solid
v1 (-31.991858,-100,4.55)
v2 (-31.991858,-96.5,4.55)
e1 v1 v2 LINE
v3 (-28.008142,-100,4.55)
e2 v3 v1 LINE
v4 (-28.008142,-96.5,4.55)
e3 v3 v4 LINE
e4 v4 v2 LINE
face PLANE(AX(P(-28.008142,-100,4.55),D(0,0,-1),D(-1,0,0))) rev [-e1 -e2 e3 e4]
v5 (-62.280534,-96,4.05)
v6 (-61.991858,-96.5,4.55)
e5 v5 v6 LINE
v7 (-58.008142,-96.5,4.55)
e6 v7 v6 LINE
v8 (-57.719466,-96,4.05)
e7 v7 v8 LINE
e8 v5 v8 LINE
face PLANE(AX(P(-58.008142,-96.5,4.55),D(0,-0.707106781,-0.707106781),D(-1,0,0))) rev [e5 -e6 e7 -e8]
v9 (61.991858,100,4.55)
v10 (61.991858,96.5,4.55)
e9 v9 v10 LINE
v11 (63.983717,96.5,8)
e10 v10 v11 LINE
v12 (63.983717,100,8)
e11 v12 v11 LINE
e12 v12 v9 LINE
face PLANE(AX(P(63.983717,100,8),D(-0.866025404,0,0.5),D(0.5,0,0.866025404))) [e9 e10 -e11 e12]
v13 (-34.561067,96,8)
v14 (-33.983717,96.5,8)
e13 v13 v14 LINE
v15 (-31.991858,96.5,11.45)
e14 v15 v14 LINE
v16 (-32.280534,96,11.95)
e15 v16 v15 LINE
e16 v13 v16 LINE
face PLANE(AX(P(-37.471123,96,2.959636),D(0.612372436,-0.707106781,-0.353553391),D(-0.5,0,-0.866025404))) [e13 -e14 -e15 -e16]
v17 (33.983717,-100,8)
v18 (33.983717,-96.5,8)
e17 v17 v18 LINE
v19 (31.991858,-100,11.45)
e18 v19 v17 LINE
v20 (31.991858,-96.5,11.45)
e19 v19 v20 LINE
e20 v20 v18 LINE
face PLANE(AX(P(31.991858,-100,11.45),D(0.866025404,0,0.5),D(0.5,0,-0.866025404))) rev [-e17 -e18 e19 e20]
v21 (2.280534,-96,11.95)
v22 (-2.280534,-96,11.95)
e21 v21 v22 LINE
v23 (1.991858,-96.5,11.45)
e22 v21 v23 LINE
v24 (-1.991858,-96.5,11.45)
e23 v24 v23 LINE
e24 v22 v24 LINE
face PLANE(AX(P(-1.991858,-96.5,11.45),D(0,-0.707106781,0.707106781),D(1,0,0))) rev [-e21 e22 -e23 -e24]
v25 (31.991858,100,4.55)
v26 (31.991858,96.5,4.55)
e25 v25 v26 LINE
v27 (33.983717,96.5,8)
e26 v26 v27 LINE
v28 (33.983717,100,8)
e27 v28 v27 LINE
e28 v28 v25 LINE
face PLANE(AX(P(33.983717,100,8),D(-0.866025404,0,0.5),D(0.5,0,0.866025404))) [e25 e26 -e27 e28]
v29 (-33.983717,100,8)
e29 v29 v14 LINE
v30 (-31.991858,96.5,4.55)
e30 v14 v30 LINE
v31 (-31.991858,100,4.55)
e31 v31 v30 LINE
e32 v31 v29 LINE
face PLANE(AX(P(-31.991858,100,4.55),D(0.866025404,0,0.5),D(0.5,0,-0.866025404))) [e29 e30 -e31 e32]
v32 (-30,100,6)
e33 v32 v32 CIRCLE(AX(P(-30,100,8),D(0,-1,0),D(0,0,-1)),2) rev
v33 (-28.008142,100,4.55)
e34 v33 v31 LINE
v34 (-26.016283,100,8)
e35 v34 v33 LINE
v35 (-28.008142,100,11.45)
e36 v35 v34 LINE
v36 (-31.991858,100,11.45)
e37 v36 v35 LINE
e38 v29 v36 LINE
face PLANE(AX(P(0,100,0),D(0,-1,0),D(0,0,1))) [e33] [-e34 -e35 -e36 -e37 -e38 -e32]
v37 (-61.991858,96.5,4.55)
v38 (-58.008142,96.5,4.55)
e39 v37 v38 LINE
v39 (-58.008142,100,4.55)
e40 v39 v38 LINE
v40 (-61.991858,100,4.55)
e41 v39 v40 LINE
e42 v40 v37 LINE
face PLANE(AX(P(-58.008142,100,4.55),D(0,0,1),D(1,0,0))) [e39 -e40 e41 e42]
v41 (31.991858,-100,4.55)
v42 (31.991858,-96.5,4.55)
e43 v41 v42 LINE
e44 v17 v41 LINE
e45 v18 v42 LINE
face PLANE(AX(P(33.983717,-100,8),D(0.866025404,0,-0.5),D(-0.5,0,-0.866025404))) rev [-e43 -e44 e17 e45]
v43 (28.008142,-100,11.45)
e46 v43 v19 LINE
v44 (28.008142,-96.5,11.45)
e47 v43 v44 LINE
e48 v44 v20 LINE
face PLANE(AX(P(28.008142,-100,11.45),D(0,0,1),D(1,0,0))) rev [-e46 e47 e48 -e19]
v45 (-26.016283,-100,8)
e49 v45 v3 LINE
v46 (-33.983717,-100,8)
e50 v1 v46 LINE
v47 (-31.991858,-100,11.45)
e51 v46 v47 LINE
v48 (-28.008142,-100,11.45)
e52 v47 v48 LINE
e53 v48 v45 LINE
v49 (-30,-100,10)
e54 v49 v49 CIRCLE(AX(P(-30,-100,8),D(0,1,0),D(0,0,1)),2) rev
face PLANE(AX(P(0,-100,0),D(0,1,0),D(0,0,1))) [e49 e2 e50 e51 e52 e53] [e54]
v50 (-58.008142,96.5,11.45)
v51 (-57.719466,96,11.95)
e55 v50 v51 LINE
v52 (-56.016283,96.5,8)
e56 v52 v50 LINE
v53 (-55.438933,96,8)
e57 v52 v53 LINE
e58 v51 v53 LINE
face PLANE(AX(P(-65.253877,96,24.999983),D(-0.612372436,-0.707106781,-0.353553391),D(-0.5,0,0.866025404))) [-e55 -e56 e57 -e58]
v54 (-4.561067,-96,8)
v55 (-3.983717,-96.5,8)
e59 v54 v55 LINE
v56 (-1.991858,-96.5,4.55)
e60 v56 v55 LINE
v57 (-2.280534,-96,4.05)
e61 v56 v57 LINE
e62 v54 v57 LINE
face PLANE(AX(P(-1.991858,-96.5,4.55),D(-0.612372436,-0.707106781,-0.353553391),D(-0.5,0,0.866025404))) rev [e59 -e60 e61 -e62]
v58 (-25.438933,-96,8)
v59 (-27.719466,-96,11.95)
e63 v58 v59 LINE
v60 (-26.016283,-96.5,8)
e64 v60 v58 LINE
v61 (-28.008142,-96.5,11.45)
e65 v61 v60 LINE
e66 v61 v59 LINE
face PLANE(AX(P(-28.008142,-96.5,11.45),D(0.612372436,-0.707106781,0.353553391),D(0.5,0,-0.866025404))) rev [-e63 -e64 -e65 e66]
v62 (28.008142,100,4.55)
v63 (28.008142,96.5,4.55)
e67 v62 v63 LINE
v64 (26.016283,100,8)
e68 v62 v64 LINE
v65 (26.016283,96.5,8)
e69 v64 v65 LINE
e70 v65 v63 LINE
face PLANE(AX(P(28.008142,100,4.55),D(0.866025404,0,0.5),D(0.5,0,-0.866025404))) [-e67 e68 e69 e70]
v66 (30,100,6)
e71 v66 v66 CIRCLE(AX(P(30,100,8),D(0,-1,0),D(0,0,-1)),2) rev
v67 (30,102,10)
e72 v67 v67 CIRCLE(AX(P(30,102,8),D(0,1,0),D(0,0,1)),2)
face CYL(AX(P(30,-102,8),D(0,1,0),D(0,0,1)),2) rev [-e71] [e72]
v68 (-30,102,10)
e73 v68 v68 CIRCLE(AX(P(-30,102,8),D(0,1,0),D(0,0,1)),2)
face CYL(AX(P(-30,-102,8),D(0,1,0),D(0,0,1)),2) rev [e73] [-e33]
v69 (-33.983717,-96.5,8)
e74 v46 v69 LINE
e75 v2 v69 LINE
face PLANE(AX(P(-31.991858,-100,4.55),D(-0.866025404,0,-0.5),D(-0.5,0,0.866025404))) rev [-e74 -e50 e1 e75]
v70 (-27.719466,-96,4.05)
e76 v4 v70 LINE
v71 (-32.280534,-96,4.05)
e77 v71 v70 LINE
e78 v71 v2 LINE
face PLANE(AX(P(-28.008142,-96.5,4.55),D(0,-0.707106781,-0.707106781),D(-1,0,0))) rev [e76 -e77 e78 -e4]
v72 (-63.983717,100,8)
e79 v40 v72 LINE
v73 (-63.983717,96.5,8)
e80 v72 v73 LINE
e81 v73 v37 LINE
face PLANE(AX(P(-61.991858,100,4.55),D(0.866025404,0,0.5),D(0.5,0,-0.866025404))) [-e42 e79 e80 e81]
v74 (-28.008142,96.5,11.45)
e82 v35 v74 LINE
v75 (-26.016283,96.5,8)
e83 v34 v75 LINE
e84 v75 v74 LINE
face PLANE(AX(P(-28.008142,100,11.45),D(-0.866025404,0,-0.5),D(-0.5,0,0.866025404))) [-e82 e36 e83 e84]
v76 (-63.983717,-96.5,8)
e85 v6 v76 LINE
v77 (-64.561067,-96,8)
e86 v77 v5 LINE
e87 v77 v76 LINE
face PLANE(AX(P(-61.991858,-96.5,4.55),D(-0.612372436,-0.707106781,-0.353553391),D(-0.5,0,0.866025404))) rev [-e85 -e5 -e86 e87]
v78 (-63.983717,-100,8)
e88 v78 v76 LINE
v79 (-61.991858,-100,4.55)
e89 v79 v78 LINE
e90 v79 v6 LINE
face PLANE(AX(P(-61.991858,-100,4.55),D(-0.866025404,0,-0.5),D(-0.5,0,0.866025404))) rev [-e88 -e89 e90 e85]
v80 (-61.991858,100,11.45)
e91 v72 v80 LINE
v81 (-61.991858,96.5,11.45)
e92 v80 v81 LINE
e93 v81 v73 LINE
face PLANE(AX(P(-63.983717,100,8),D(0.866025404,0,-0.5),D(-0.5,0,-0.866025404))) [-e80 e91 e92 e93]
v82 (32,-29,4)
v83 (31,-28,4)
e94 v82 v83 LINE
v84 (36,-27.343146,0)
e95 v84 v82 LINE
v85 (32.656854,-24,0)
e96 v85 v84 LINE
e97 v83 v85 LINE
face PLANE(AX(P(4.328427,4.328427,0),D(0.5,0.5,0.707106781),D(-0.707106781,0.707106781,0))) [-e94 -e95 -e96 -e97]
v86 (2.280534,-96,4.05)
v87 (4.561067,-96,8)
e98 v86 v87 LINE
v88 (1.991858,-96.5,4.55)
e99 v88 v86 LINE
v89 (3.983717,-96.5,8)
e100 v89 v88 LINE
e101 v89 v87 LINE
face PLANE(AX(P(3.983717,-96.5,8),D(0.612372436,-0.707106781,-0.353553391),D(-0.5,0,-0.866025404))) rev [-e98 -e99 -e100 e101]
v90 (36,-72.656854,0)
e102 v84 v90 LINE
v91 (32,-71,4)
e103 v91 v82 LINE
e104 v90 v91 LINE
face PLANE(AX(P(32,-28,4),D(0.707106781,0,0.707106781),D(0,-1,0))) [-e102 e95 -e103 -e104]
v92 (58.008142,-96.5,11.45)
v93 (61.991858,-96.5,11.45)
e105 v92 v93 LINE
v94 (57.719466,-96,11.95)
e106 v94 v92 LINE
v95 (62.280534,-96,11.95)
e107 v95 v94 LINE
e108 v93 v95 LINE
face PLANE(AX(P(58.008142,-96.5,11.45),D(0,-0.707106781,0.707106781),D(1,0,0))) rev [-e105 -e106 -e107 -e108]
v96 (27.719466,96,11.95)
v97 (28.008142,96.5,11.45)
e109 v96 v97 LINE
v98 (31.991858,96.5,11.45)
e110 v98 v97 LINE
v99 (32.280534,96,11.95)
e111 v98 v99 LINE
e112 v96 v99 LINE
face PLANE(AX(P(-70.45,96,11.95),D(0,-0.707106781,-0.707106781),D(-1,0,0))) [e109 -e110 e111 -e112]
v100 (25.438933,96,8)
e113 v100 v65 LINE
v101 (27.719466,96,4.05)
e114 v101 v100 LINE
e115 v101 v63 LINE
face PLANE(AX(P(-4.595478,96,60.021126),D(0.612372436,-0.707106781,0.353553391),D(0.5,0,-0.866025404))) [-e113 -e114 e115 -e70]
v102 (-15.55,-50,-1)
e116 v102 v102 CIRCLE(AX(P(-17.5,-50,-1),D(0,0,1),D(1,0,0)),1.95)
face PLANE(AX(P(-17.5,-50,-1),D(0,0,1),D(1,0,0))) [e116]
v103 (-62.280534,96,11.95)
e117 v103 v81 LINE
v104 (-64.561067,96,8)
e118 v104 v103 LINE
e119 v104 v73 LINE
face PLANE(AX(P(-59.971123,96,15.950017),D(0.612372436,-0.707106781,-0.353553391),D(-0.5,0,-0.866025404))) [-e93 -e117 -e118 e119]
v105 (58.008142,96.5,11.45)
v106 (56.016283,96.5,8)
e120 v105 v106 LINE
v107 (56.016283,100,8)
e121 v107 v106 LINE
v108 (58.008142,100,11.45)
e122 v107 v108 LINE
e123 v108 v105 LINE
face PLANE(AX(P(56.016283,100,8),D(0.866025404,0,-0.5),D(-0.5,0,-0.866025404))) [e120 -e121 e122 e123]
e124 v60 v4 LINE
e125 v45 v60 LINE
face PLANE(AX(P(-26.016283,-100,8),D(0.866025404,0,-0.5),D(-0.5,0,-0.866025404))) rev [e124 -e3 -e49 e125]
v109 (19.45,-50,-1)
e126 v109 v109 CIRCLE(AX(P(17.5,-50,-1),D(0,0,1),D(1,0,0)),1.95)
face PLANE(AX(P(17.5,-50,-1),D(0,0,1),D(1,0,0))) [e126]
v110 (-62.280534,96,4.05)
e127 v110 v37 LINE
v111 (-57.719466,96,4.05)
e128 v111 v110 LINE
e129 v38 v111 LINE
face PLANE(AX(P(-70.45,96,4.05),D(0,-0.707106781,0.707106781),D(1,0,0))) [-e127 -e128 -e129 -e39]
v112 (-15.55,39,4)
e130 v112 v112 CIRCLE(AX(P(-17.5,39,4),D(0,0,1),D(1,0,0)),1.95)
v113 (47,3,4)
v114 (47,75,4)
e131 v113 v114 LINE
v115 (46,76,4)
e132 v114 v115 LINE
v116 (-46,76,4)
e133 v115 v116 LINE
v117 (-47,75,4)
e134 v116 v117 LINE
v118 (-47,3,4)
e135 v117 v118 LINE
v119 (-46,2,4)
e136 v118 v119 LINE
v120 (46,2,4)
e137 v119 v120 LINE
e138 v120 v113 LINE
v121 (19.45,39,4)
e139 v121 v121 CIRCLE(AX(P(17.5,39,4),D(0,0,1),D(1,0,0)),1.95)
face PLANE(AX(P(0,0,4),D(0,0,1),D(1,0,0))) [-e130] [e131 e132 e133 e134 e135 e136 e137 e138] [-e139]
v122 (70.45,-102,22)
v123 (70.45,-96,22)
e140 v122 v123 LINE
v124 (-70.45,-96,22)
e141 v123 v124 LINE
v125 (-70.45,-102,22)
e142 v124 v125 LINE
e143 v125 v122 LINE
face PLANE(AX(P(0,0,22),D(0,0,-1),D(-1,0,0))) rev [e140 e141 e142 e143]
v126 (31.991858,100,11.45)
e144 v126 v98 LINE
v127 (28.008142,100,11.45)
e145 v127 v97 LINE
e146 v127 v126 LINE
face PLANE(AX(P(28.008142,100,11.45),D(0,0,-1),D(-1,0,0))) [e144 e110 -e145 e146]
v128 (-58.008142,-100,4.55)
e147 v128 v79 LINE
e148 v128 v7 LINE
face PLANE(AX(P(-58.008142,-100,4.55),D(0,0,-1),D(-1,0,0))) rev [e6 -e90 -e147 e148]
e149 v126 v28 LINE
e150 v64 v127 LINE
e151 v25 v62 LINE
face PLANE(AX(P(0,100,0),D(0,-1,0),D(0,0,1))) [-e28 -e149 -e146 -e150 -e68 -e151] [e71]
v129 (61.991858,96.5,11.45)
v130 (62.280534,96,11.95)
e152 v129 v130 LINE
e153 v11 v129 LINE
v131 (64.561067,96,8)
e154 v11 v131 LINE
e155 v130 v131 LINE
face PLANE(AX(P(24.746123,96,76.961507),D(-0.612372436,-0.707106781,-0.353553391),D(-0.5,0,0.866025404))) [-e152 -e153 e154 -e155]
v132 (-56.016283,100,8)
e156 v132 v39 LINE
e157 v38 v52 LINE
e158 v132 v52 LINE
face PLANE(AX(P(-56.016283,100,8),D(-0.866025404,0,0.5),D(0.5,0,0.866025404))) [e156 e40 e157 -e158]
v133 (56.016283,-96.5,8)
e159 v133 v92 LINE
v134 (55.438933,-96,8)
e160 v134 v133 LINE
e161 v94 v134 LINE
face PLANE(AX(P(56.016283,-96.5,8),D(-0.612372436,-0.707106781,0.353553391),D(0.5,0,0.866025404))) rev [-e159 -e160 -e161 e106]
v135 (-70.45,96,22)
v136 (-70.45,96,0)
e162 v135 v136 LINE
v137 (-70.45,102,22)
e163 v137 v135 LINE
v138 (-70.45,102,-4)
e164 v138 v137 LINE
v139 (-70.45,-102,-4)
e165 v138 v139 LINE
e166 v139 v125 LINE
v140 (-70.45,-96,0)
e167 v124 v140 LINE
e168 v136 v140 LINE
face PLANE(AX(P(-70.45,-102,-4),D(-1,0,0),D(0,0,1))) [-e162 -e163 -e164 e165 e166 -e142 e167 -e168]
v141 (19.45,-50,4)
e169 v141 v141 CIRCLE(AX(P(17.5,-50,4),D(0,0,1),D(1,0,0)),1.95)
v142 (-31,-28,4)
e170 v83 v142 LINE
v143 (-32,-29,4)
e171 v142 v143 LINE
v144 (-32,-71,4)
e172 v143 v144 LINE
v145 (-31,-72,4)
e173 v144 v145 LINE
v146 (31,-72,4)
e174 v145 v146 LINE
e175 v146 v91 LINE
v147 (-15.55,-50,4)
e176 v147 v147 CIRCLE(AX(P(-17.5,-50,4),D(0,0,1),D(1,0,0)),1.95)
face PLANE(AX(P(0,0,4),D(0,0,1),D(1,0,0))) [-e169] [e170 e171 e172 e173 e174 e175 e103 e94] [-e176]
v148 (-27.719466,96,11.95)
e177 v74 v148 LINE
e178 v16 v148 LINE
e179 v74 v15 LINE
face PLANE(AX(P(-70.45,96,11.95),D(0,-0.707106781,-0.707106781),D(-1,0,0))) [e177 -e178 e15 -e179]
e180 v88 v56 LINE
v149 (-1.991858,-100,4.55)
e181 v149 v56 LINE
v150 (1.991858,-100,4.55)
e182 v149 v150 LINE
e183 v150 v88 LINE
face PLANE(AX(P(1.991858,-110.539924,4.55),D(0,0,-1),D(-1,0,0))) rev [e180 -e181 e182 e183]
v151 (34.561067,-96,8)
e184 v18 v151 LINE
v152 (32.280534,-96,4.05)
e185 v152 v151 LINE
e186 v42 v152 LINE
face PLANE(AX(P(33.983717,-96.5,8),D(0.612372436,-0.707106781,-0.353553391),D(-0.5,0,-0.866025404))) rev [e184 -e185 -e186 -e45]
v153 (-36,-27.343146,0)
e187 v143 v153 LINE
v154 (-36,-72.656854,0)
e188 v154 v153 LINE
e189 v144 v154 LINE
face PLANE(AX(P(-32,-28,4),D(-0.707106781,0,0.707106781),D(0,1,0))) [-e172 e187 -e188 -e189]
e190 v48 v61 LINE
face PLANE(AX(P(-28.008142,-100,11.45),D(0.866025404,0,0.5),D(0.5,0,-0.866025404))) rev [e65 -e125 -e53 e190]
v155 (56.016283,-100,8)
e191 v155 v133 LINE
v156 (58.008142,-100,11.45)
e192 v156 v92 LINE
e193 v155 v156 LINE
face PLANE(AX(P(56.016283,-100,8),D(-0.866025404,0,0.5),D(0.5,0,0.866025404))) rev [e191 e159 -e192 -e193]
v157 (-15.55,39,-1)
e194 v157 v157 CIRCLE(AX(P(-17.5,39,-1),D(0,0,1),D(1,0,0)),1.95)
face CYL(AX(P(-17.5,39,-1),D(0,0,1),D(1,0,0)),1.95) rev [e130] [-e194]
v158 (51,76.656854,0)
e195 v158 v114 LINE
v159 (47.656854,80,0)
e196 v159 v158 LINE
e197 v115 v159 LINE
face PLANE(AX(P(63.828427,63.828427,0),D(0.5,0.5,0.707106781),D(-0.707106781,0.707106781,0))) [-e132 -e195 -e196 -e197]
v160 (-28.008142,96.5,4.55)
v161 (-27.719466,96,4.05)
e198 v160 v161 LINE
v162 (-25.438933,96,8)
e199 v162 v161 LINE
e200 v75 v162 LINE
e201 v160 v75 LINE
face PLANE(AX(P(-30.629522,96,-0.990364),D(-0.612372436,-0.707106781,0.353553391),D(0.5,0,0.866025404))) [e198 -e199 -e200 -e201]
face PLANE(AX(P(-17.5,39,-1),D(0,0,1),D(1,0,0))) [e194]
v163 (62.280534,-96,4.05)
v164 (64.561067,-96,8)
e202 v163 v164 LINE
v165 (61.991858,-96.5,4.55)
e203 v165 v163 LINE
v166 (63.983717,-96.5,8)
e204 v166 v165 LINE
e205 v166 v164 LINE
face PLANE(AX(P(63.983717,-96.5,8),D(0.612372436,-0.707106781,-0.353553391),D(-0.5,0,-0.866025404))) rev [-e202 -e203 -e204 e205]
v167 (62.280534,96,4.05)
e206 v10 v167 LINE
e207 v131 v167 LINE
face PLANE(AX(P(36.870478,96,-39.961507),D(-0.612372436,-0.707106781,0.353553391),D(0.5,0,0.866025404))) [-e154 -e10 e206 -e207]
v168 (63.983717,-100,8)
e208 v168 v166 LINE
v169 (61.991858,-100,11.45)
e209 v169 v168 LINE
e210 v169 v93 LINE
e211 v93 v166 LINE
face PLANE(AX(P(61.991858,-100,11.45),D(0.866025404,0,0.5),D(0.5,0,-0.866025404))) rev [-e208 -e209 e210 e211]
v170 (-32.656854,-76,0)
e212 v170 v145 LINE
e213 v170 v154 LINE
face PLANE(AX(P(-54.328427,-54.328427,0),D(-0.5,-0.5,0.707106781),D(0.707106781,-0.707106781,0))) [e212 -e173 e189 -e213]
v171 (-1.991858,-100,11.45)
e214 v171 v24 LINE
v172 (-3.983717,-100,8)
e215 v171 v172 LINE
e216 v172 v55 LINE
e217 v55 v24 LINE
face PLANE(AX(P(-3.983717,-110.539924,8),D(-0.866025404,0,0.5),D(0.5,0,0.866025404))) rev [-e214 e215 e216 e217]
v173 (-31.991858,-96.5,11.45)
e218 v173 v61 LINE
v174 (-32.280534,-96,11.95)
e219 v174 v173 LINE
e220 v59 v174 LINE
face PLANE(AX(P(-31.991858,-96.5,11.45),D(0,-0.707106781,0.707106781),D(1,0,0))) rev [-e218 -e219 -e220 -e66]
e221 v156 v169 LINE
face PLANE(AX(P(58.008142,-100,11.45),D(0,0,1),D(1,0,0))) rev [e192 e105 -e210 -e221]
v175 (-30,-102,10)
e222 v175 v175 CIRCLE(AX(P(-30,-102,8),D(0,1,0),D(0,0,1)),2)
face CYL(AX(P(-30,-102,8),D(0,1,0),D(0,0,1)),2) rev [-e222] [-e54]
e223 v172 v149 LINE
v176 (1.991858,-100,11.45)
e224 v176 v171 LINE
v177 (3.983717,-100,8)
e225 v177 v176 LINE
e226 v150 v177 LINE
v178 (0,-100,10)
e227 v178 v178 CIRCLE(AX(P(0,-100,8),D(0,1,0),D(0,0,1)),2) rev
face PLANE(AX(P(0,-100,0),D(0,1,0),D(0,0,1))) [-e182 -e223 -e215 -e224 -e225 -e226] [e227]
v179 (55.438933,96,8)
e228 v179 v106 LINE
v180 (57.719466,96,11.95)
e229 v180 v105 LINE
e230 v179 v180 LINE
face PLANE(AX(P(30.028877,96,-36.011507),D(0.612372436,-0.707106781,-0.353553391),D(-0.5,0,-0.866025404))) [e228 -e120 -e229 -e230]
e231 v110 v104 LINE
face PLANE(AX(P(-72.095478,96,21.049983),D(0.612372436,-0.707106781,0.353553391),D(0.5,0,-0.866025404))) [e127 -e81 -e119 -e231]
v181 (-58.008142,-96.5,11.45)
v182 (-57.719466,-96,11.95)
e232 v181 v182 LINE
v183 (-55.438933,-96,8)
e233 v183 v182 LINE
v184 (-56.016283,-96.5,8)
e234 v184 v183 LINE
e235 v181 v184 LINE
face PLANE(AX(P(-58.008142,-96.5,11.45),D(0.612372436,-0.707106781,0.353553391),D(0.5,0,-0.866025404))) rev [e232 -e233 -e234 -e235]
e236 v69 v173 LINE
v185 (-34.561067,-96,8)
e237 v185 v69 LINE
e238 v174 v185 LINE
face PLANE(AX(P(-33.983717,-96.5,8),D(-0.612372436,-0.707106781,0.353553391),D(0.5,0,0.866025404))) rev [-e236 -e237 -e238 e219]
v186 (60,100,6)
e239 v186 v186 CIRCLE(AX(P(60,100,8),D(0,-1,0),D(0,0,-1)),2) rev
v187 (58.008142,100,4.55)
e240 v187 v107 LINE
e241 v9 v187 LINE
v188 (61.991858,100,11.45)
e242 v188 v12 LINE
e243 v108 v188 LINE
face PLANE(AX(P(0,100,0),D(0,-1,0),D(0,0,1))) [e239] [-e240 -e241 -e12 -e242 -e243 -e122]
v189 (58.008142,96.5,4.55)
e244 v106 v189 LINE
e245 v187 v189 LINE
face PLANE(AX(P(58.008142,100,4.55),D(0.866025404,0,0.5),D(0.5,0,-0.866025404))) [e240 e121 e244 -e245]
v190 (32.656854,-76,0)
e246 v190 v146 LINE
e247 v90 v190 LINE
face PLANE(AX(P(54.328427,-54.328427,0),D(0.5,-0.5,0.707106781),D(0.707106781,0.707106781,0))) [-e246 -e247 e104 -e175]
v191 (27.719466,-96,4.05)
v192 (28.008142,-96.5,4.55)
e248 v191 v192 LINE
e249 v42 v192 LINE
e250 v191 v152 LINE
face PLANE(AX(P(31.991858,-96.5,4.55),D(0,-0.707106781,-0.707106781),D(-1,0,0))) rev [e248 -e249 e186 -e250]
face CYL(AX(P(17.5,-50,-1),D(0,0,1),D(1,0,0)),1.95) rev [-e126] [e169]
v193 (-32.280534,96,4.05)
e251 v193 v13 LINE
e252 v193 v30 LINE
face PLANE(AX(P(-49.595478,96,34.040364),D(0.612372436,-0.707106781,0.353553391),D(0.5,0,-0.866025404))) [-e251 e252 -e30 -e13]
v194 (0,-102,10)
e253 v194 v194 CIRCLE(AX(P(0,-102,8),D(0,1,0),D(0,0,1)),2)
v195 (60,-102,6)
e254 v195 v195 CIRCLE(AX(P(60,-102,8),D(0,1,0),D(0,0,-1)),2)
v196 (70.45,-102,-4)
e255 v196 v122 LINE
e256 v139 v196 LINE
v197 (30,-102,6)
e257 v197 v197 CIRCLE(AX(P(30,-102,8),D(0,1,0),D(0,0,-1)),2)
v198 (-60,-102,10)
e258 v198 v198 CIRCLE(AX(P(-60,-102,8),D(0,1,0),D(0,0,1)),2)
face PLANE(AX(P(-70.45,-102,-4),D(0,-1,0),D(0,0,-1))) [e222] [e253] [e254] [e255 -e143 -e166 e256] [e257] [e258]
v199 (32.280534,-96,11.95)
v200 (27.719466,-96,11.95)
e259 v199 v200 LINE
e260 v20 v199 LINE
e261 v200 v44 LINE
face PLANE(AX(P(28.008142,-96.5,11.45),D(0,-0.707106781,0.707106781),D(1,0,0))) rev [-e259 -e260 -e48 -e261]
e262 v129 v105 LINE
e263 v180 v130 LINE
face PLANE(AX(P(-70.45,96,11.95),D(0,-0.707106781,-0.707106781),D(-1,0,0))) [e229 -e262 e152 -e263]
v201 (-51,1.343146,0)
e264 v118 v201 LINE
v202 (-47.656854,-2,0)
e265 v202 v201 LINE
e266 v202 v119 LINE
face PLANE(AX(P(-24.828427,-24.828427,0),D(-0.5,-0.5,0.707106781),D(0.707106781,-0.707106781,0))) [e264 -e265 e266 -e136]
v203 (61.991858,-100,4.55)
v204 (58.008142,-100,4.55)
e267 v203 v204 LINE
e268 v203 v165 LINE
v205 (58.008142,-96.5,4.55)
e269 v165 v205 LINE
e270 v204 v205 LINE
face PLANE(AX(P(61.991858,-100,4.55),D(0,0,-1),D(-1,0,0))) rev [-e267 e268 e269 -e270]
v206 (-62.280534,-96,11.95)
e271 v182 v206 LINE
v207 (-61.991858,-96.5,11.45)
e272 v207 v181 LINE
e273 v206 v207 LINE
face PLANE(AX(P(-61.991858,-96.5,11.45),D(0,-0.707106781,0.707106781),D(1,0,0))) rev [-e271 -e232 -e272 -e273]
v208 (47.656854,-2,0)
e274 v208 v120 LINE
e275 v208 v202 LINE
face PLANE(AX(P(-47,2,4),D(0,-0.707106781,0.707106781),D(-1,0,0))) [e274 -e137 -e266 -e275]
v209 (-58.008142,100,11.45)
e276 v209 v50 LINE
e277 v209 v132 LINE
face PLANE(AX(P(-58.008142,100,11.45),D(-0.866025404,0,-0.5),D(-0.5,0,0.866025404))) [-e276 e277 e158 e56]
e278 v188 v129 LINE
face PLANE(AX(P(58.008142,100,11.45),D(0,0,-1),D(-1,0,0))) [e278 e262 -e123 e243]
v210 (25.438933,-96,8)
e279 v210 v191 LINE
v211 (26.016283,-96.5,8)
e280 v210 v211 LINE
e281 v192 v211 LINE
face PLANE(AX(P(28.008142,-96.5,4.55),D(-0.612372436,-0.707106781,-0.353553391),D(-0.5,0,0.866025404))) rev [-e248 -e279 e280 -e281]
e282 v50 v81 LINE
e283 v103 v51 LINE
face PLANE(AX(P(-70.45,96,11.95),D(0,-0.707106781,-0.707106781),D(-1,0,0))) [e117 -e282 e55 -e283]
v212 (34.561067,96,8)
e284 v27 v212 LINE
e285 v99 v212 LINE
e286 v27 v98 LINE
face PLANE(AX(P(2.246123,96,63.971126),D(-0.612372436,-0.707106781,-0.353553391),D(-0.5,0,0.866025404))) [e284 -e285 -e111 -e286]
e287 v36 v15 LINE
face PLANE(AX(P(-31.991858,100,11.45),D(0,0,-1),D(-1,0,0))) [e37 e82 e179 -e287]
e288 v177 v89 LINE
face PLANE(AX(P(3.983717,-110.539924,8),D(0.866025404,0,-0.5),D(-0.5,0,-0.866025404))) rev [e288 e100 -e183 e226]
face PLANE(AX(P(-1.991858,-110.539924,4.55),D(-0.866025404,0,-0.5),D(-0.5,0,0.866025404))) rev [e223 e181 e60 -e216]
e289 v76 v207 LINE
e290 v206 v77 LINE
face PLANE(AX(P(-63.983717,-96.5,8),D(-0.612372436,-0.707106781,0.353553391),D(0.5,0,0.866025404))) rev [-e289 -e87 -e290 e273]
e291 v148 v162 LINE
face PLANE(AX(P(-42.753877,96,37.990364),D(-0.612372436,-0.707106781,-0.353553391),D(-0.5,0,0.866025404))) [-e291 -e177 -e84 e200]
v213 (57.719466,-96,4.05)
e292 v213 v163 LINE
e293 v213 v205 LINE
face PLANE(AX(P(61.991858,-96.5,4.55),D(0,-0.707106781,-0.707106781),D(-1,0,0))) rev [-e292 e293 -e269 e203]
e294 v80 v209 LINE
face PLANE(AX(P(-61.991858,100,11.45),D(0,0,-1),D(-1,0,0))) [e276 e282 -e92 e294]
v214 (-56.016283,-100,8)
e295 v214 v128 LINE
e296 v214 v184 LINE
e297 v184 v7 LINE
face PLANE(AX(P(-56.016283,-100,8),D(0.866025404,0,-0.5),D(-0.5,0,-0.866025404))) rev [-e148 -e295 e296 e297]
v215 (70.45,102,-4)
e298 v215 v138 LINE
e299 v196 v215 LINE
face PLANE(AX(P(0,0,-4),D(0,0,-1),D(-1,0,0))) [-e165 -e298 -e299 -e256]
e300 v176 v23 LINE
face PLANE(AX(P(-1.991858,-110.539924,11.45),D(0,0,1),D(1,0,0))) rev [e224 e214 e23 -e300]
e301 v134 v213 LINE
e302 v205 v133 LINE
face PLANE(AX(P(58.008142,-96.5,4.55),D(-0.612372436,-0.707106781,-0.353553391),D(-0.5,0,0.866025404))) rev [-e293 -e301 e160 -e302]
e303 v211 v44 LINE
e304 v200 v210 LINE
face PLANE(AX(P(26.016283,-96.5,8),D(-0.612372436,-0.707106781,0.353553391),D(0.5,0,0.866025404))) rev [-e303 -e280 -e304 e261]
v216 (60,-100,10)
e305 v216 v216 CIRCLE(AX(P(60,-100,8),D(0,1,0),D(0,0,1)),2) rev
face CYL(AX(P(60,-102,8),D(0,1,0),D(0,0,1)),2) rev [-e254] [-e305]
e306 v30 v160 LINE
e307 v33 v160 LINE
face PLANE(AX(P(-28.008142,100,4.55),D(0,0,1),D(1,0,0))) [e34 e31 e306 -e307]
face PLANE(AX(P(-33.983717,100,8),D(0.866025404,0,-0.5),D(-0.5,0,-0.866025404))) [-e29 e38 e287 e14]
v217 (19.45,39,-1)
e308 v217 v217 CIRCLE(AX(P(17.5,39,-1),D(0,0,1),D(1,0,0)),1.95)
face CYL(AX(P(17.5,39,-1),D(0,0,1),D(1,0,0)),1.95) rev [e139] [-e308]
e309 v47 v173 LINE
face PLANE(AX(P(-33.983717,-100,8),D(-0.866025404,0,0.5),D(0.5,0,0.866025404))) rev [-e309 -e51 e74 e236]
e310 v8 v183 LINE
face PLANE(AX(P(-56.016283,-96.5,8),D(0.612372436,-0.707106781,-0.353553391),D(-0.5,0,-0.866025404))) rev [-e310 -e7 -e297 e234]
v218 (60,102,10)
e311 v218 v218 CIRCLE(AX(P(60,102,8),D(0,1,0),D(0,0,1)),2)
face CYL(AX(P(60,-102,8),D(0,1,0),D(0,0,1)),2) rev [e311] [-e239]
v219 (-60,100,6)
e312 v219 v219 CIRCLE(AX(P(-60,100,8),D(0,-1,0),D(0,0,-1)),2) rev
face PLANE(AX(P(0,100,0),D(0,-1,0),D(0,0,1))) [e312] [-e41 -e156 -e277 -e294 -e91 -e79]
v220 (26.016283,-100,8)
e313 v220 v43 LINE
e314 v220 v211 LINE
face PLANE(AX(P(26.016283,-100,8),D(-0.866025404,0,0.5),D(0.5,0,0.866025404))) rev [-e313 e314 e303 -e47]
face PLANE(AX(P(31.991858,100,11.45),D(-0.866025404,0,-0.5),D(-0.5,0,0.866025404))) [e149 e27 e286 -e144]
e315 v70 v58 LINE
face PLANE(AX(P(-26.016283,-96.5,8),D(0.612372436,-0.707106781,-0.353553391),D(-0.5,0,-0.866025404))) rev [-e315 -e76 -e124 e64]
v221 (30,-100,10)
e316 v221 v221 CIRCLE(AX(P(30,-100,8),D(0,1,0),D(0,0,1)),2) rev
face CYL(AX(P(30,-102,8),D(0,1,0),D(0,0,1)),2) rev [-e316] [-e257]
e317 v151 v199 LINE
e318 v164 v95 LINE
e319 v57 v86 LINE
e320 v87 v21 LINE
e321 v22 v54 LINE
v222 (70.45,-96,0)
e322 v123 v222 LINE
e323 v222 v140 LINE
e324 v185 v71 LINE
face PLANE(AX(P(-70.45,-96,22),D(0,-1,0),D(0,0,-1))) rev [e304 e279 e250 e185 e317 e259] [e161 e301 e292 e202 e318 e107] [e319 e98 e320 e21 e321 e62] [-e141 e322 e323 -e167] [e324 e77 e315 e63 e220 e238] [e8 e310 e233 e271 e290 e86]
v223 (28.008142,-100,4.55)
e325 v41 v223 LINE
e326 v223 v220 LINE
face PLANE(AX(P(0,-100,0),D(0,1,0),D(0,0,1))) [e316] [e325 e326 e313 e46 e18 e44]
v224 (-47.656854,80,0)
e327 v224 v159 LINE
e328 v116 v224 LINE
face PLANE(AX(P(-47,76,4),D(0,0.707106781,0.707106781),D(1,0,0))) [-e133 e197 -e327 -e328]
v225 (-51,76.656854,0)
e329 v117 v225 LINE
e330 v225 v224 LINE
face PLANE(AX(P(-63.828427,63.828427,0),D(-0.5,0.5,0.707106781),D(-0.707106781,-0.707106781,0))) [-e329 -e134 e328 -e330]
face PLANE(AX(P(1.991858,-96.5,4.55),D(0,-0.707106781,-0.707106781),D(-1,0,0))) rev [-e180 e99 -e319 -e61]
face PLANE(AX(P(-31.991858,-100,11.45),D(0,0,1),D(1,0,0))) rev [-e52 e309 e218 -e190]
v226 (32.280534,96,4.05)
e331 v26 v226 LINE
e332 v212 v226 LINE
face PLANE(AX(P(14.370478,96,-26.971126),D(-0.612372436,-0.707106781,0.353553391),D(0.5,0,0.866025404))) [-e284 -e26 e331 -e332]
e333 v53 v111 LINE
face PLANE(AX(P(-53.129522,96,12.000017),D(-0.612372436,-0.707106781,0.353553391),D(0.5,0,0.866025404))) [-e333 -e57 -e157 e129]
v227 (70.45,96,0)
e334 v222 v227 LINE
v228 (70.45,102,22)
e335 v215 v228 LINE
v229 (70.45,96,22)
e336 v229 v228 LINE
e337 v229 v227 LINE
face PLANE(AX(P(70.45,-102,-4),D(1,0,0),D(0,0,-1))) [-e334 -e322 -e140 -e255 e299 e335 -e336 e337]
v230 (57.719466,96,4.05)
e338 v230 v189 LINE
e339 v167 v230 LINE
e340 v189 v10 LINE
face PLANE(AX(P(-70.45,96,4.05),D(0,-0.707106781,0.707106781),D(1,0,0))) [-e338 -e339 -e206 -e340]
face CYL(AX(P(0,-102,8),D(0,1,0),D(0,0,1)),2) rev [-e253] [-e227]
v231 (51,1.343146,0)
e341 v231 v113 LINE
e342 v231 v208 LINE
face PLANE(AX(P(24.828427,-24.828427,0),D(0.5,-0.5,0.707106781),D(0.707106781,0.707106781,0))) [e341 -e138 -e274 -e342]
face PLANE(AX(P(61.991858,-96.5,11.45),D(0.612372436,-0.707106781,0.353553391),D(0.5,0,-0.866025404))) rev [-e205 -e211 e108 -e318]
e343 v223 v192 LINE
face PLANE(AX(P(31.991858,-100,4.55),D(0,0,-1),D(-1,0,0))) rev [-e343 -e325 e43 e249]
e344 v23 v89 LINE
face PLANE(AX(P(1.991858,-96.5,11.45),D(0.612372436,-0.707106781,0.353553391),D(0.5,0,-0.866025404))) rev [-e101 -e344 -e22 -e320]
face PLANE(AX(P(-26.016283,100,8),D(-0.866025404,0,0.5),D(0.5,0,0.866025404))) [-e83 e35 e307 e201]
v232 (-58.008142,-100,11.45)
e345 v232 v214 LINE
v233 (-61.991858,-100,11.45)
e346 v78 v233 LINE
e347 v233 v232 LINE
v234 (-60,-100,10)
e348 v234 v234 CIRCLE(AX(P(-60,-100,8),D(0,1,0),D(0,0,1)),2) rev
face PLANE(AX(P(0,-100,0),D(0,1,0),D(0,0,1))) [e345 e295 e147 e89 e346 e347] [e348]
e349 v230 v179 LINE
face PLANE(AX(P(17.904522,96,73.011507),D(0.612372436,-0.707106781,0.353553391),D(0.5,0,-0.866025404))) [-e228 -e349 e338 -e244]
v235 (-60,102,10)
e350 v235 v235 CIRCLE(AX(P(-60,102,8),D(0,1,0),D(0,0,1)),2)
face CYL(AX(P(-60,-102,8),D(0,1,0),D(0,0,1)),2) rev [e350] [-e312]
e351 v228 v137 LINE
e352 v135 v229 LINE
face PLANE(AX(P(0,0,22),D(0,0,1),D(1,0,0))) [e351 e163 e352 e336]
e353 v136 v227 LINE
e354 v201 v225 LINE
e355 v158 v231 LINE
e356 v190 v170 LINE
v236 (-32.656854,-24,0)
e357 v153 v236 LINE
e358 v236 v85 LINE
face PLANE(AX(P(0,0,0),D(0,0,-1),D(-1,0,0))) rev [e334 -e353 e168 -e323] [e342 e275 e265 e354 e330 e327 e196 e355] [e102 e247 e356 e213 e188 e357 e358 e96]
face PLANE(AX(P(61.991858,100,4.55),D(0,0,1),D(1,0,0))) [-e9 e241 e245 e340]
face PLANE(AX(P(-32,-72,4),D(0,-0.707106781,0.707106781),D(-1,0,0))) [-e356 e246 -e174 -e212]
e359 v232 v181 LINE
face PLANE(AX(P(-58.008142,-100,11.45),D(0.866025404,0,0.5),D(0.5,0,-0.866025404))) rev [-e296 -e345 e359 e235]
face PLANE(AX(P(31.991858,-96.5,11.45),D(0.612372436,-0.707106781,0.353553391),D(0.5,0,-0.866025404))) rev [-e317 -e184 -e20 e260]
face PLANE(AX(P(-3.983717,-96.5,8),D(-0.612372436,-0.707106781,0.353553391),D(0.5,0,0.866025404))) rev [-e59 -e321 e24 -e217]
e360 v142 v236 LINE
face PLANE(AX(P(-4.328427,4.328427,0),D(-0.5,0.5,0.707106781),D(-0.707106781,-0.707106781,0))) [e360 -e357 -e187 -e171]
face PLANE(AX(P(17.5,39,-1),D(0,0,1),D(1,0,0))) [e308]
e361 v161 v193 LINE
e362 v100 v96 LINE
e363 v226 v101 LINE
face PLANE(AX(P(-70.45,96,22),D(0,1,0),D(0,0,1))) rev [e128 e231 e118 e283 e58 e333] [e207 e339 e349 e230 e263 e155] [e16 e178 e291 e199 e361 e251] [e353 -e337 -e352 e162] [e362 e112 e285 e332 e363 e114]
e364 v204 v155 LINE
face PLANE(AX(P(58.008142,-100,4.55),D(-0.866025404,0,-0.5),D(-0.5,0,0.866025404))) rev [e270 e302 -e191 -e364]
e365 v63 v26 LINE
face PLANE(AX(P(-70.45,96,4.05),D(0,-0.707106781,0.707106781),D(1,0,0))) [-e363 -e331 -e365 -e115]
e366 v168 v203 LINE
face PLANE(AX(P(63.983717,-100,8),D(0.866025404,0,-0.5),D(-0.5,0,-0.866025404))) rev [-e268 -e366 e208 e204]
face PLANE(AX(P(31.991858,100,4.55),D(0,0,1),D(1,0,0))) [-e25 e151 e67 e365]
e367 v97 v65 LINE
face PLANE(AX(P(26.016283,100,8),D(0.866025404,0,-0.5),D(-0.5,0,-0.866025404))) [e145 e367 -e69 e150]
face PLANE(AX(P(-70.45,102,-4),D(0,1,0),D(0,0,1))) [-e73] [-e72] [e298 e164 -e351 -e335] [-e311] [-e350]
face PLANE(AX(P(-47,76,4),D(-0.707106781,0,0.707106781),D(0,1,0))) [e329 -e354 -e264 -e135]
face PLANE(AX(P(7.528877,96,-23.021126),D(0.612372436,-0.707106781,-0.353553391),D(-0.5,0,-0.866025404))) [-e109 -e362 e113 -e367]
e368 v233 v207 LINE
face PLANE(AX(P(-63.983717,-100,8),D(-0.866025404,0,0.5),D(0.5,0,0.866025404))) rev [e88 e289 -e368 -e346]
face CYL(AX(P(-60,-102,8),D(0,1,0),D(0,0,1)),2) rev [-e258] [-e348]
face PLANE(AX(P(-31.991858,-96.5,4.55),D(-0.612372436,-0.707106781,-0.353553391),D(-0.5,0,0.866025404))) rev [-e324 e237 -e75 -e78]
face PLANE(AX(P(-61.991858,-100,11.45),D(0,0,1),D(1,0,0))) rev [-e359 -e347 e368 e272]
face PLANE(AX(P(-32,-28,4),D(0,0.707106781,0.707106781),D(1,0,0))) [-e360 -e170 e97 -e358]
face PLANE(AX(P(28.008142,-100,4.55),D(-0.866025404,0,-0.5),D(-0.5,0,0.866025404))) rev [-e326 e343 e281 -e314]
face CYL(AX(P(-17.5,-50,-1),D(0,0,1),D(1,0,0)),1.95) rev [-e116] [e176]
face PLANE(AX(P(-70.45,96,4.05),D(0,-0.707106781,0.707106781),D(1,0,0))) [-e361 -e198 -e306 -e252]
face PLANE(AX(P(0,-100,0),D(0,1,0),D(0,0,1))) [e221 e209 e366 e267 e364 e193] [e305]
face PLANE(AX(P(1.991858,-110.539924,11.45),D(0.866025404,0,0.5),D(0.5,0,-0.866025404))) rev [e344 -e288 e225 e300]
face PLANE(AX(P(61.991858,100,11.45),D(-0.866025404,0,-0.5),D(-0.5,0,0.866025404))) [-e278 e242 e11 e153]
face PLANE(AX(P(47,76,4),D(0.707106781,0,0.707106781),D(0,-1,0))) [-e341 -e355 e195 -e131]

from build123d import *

# Parameters (mm, degrees)
SKETCH1_W               = 140.9
SKETCH1_H               = 204
BOSS_EXTRUDE1_DEPTH     = 4
SKETCH4_W               = 140.9
SKETCH4_H               = 6
BOSS_EXTRUDE3_DEPTH     = 22
CUT_EXTRUDE1_DEPTH      = 217.940550612
CUT_EXTRUDE1_DEPTH_BACK = 217.940550612
SKETCH5_R               = 2
CUT_EXTRUDE4_DEPTH      = 4
SKETCH9_R               = 2
CUT_EXTRUDE5_DEPTH      = 212.308311479
CUT_EXTRUDE6_DEPTH      = 4
CHAMFER1_SIZE           = 0.5
SKETCH11_W              = 64
SKETCH11_H              = 44
SKETCH11_W_2            = 94
SKETCH11_H_2            = 74
BOSS_EXTRUDE4_DEPTH     = 4
CHAMFER2_SIZE           = 1
CHAMFER3_SIZE           = 4
SKETCH12_R              = 1.95
CUT_EXTRUDE7_DEPTH      = 5


with BuildPart() as part:
    # Sketch1 → Boss-Extrude1 (new body)
    with BuildSketch(Plane.XY):
        Rectangle(SKETCH1_W, SKETCH1_H)
    extrude(amount=-BOSS_EXTRUDE1_DEPTH)

    # Sketch4 → Boss-Extrude3 (add)
    with BuildSketch(Plane.XY):
        with Locations((0, 99)):
            Rectangle(SKETCH4_W, SKETCH4_H)
        with Locations((0, -99)):
            Rectangle(SKETCH4_W, SKETCH4_H)
    extrude(amount=BOSS_EXTRUDE3_DEPTH)

    # Sketch5 → Cut-Extrude1 (cut, two sides: drawn at the far end of the back side and taken through both)
    with BuildSketch(Plane(origin=(0, 102, 0), x_dir=(1, 0, 0), z_dir=(0, 1, 0)).offset(-CUT_EXTRUDE1_DEPTH_BACK)):
        with Locations(Location((-30, -8, 0), (0, 0, 270))):
            Circle(SKETCH5_R)
        with Locations(Location((-60, -8, 0), (0, 0, 270))):
            Circle(SKETCH5_R)
        with Locations(Location((60, -8, 0), (0, 0, 90))):
            Circle(SKETCH5_R)
        with Locations(Location((30, -8, 0), (0, 0, 90))):
            Circle(SKETCH5_R)
    extrude(amount=CUT_EXTRUDE1_DEPTH + CUT_EXTRUDE1_DEPTH_BACK, mode=Mode.SUBTRACT)

    # Sketch8 → Cut-Extrude4 (cut)
    with BuildSketch(Plane(origin=(0, -96, 0), x_dir=(1, 0, 0), z_dir=(0, 1, 0))):
        Polygon((-26.016283143, -8), (-28.008141571, -4.55), (-31.991858429, -4.55), (-33.983716857, -8), (-31.991858429, -11.45), (-28.008141571, -11.45), align=None)
        Polygon((-56.016283143, -8), (-58.008141571, -4.55), (-61.991858429, -4.55), (-63.983716857, -8), (-61.991858429, -11.45), (-58.008141571, -11.45), align=None)
        Polygon((33.983716857, -8), (31.991858429, -4.55), (28.008141571, -4.55), (26.016283143, -8), (28.008141571, -11.45), (31.991858429, -11.45), align=None)
        Polygon((63.983716857, -8), (61.991858429, -4.55), (58.008141571, -4.55), (56.016283143, -8), (58.008141571, -11.45), (61.991858429, -11.45), align=None)
    cut_extrude4 = extrude(amount=-CUT_EXTRUDE4_DEPTH, mode=Mode.SUBTRACT)

    # Mirror1: Cut-Extrude4 across plane
    add(cut_extrude4.mirror(Plane.ZX), mode=Mode.SUBTRACT)

    # Sketch9 → Cut-Extrude5 (cut, through all)
    with BuildSketch(Plane(origin=(0, -96, 0), x_dir=(1, 0, 0), z_dir=(0, 1, 0))):
        with Locations(Location((0, -8, 0), (0, 0, 270))):
            Circle(SKETCH9_R)
    extrude(amount=-CUT_EXTRUDE5_DEPTH, mode=Mode.SUBTRACT)

    # Sketch10 → Cut-Extrude6 (cut)
    with BuildSketch(Plane(origin=(0, -96, 0), x_dir=(1, 0, 0), z_dir=(0, 1, 0))):
        Polygon((1.991858429, -4.55), (-1.991858429, -4.55), (-3.983716857, -8), (-1.991858429, -11.45), (1.991858429, -11.45), (3.983716857, -8), align=None)
    extrude(amount=-CUT_EXTRUDE6_DEPTH, mode=Mode.SUBTRACT)

    # Chamfer1
    chamfer1_edges = [part.edges().sort_by_distance(p)[0] for p in [
        (32.987787643, -96, 9.725),
        (32.987787643, -96, 6.275),
        (30, -96, 4.55),
        (27.012212357, -96, 6.275),
        (27.012212357, -96, 9.725),
        (30, -96, 11.45),
        (62.987787643, -96, 9.725),
        (62.987787643, -96, 6.275),
        (60, -96, 4.55),
        (57.012212357, -96, 6.275),
        (57.012212357, -96, 9.725),
        (60, -96, 11.45),
        (-57.012212357, 96, 9.725),
        (-57.012212357, 96, 6.275),
        (-60, 96, 4.55),
        (-62.987787643, 96, 6.275),
        (-62.987787643, 96, 9.725),
        (-60, 96, 11.45),
        (-27.012212357, 96, 9.725),
        (-27.012212357, 96, 6.275),
        (-30, 96, 4.55),
        (-32.987787643, 96, 6.275),
        (-32.987787643, 96, 9.725),
        (-30, 96, 11.45),
        (32.987787643, 96, 9.725),
        (32.987787643, 96, 6.275),
        (30, 96, 4.55),
        (27.012212357, 96, 6.275),
        (27.012212357, 96, 9.725),
        (30, 96, 11.45),
        (62.987787643, 96, 9.725),
        (62.987787643, 96, 6.275),
        (60, 96, 4.55),
        (57.012212357, 96, 6.275),
        (57.012212357, 96, 9.725),
        (60, 96, 11.45),
        (2.987787643, -96, 6.275),
        (0, -96, 4.55),
        (-2.987787643, -96, 6.275),
        (-2.987787643, -96, 9.725),
        (0, -96, 11.45),
        (2.987787643, -96, 9.725),
        (-57.012212357, -96, 9.725),
        (-57.012212357, -96, 6.275),
        (-60, -96, 4.55),
        (-62.987787643, -96, 6.275),
        (-62.987787643, -96, 9.725),
        (-60, -96, 11.45),
        (-27.012212357, -96, 9.725),
        (-27.012212357, -96, 6.275),
        (-30, -96, 4.55),
        (-32.987787643, -96, 6.275),
        (-32.987787643, -96, 9.725),
        (-30, -96, 11.45),
    ]]
    chamfer(chamfer1_edges, length=CHAMFER1_SIZE)

    # Sketch11 → Boss-Extrude4 (add)
    with BuildSketch(Plane.XY):
        with Locations((0, -50)):
            Rectangle(SKETCH11_W, SKETCH11_H)
        with Locations((0, 39)):
            Rectangle(SKETCH11_W_2, SKETCH11_H_2)
    extrude(amount=BOSS_EXTRUDE4_DEPTH)

    # Chamfer2
    chamfer2_edges = [part.edges().sort_by_distance(p)[0] for p in [
        (-32, -28, 2),
        (-32, -72, 2),
        (32, -72, 2),
        (32, -28, 2),
        (-47, 76, 2),
        (-47, 2, 2),
        (47, 2, 2),
        (47, 76, 2),
    ]]
    chamfer(chamfer2_edges, length=CHAMFER2_SIZE)

    # Chamfer3
    chamfer3_edges = [part.edges().sort_by_distance(p)[0] for p in [
        (-46.5, 2.5, 0),
        (0, 2, 0),
        (46.5, 2.5, 0),
        (47, 39, 0),
        (46.5, 75.5, 0),
        (0, 76, 0),
        (-46.5, 75.5, 0),
        (-47, 39, 0),
        (-31.5, -71.5, 0),
        (0, -72, 0),
        (31.5, -71.5, 0),
        (32, -50, 0),
        (31.5, -28.5, 0),
        (0, -28, 0),
        (-31.5, -28.5, 0),
        (-32, -50, 0),
    ]]
    chamfer(chamfer3_edges, length=CHAMFER3_SIZE - 0.0001)  # a hair under: the kernel refuses the full size

    # Sketch12 → Cut-Extrude7 (cut)
    with BuildSketch(Plane.XY.offset(4)):
        with Locations((-17.5, 39)):
            Circle(SKETCH12_R)
        with Locations((17.5, 39)):
            Circle(SKETCH12_R)
        with Locations((-17.5, -50)):
            Circle(SKETCH12_R)
        with Locations((17.5, -50)):
            Circle(SKETCH12_R)
    extrude(amount=-CUT_EXTRUDE7_DEPTH, mode=Mode.SUBTRACT)


solid = part.part
